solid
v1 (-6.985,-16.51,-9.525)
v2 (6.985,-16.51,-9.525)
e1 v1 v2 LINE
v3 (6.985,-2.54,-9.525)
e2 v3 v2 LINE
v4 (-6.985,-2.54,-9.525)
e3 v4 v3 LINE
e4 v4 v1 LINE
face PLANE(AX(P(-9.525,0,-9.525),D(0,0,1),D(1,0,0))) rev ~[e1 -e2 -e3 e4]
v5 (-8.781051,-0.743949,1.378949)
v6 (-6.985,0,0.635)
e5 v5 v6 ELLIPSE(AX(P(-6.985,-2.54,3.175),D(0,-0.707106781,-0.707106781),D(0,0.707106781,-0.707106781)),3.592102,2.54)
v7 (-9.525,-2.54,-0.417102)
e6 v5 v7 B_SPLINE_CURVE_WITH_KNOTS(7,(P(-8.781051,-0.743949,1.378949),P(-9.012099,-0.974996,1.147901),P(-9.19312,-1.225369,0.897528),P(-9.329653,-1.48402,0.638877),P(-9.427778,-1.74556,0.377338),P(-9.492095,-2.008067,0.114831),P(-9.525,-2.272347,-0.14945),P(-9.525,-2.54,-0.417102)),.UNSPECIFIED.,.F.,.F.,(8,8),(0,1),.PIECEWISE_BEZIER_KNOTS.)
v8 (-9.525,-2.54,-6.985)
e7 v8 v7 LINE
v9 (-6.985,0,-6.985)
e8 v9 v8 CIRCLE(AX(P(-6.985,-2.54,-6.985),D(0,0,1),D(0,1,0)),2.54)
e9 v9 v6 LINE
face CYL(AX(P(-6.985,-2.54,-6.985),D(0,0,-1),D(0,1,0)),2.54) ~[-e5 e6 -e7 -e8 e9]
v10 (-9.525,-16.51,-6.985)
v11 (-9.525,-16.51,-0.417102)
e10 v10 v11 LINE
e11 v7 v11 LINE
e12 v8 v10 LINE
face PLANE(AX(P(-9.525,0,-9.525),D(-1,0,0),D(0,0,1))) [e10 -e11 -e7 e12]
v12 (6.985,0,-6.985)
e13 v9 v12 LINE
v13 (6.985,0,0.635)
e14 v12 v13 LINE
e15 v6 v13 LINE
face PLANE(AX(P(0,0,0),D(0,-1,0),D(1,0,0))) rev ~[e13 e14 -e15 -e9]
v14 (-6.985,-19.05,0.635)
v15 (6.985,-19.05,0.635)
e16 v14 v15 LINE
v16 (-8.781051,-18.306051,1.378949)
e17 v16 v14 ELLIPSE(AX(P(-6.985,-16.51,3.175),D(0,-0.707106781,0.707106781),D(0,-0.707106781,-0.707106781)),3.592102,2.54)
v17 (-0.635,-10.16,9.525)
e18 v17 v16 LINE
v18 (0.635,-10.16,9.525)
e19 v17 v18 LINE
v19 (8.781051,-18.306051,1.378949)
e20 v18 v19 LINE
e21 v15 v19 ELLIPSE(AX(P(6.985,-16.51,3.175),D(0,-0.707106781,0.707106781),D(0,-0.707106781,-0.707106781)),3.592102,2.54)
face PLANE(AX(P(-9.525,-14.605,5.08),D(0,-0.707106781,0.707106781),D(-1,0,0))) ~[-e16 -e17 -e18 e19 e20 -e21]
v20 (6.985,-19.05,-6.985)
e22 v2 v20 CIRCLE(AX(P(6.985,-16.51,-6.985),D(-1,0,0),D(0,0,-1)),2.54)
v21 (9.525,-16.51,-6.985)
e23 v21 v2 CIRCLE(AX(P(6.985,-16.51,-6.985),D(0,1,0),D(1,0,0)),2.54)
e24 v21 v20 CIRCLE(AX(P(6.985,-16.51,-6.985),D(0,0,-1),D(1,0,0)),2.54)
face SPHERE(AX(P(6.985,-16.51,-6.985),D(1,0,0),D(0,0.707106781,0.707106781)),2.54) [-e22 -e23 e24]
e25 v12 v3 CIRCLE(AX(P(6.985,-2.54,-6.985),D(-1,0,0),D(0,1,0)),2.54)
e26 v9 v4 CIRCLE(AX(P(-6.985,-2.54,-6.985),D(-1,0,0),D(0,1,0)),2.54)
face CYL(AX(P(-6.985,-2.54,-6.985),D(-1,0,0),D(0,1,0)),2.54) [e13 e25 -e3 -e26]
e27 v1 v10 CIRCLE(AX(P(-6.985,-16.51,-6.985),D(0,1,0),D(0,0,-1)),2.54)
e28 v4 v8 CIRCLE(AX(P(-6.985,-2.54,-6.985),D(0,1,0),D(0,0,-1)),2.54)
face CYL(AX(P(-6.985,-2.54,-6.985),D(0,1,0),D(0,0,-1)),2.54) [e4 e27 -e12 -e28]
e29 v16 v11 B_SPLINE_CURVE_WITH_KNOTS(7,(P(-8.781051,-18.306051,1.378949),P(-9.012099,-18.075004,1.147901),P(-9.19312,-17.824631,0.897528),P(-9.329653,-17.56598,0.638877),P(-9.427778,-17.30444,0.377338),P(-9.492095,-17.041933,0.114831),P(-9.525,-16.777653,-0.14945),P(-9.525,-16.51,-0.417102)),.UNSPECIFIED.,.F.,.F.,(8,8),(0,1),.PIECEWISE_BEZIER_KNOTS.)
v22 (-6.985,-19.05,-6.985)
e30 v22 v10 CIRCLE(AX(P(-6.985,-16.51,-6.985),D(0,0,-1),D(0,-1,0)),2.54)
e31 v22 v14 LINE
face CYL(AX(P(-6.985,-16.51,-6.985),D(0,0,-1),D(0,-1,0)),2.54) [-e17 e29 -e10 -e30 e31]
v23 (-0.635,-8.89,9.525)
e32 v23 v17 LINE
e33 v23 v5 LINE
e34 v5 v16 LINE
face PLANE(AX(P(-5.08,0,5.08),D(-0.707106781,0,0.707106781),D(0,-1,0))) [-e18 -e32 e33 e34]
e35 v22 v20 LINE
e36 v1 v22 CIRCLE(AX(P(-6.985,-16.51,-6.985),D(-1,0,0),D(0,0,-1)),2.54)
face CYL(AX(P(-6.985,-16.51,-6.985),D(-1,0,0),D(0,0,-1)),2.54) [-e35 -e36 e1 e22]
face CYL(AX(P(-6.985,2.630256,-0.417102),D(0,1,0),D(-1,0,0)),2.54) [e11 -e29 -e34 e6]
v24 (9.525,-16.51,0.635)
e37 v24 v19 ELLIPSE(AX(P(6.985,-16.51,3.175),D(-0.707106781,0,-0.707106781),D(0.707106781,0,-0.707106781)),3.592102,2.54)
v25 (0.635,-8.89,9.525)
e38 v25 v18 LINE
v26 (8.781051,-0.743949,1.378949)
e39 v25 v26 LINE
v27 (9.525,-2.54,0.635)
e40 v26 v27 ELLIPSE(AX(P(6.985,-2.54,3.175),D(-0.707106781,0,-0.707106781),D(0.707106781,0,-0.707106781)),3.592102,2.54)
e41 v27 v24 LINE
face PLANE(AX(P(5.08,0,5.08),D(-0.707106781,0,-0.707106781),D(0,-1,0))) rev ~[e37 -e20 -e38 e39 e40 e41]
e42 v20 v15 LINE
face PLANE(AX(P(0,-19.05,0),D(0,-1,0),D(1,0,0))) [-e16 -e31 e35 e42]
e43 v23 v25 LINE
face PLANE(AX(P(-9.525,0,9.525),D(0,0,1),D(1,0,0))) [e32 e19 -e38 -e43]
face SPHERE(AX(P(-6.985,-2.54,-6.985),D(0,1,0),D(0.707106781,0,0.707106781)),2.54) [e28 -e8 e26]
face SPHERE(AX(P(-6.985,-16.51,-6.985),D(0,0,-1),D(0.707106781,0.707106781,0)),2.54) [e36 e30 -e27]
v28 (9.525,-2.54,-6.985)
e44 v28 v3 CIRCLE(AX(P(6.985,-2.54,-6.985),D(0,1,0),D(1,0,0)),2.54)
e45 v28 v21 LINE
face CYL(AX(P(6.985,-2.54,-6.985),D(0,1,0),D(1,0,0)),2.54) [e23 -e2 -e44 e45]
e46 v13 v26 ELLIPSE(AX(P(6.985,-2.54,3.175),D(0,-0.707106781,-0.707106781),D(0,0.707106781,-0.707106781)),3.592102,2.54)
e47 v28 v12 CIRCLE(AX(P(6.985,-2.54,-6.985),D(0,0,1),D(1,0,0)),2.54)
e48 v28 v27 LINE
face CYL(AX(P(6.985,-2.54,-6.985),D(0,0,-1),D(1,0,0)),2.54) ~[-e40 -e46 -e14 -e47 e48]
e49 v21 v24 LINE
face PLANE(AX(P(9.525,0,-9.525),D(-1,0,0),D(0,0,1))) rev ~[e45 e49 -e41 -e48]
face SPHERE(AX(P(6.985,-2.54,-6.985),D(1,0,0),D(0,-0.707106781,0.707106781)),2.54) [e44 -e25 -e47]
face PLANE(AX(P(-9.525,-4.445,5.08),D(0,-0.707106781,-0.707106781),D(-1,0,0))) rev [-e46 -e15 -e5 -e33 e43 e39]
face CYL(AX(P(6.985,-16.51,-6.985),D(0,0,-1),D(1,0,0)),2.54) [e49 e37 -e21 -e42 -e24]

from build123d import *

# Parameters (mm, degrees)
F0_W         = 19.05
F0_H         = 19.05
F1_DEPTH     = 19.05
F2_SIZE      = 8.89
F3_T1_DEPTH  = 13.97
F3_T3_DEPTH  = 13.97
F3_T5_DEPTH  = 24.3105122421
F3_T7_DEPTH  = 13.97
F3_S11_W     = 2.54
F3_S11_H     = 2.54
F3_T12_DEPTH = 2.54
F3_S17_W     = 2.54
F3_S17_H     = 2.54
F3_T18_DEPTH = 2.54
F3_S23_W     = 2.54
F3_S23_H     = 2.54
F3_T24_DEPTH = 2.54
F3_S29_W     = 2.54
F3_S29_H     = 2.54
F3_T30_DEPTH = 2.54


# Not quite as in the source:
# - a fillet or chamfer that OpenCascade refuses, or shapes differently, is made with other operations: its cross-section is extruded or revolved along the edge and cut away or added


with BuildPart() as f1:
    # F0 (on Front) → F1 (new body)
    with BuildSketch(Plane.XZ):
        Rectangle(F0_W, F0_H)
    extrude(amount=F1_DEPTH)

    # F2
    f2_edges = [f1.edges().sort_by_distance(p)[0] for p in [
        (0, -19.05, 9.525),
        (0, 0, 9.525),
        (9.525, -9.525, 9.525),
        (-9.525, -9.525, 9.525),
    ]]
    chamfer(f2_edges, length=F2_SIZE)

    # F3: fillet of radius 2.54 on 9 edges, made by hand

    # F3_s2 → F3_t1 (cut)
    with BuildSketch(Plane.XY.offset(-6.985)):
        with BuildLine():
            ThreePointArc((9.525, -16.51), (8.7810512242, -18.3060512242), (6.985, -19.05))
            Line((6.985, -19.05), (9.525, -19.05))
            Line((9.525, -19.05), (9.525, -16.51))
        make_face()
        with BuildLine():
            ThreePointArc((-6.985, 0), (-8.7810512242, -0.7439487758), (-9.525, -2.54))
            Line((-9.525, -2.54), (-9.525, 0))
            Line((-9.525, 0), (-6.985, 0))
        make_face()
        with BuildLine():
            ThreePointArc((-6.985, -19.05), (-8.7810512242, -18.3060512242), (-9.525, -16.51))
            Line((-9.525, -16.51), (-9.525, -19.05))
            Line((-9.525, -19.05), (-6.985, -19.05))
        make_face()
        with BuildLine():
            ThreePointArc((9.525, -2.54), (8.7810512242, -0.7439487758), (6.985, 0))
            Line((6.985, 0), (9.525, 0))
            Line((9.525, 0), (9.525, -2.54))
        make_face()
    extrude(amount=F3_T1_DEPTH, mode=Mode.SUBTRACT)

    # F3_s4 → F3_t3 (cut)
    with BuildSketch(Plane.YZ.offset(-6.985)):
        with BuildLine():
            ThreePointArc((-16.51, -9.525), (-18.3060512242, -8.7810512242), (-19.05, -6.985))
            Line((-19.05, -6.985), (-19.05, -9.525))
            Line((-19.05, -9.525), (-16.51, -9.525))
        make_face()
        with BuildLine():
            ThreePointArc((0, -6.985), (-0.7439487758, -8.7810512242), (-2.54, -9.525))
            Line((-2.54, -9.525), (0, -9.525))
            Line((0, -9.525), (0, -6.985))
        make_face()
    extrude(amount=F3_T3_DEPTH, mode=Mode.SUBTRACT)

    # F3_s6 → F3_t5 (cut)
    with BuildSketch(Plane.XZ.offset(-2.6302561211)):
        with BuildLine():
            ThreePointArc((-9.525, -0.4171024484), (-9.3316540126, 0.5549134698), (-8.7810512242, 1.3789487758))
            Line((-8.7810512242, 1.3789487758), (-9.525, 0.635))
            Line((-9.525, 0.635), (-9.525, -0.4171024484))
        make_face()
    extrude(amount=F3_T5_DEPTH, mode=Mode.SUBTRACT)

    # F3_s8 → F3_t7 (cut)
    with BuildSketch(Plane.XZ.offset(2.54)):
        with BuildLine():
            ThreePointArc((-6.985, -9.525), (-8.7810512242, -8.7810512242), (-9.525, -6.985))
            Line((-9.525, -6.985), (-9.525, -9.525))
            Line((-9.525, -9.525), (-6.985, -9.525))
        make_face()
        with BuildLine():
            ThreePointArc((9.525, -6.985), (8.7810512242, -8.7810512242), (6.985, -9.525))
            Line((6.985, -9.525), (9.525, -9.525))
            Line((9.525, -9.525), (9.525, -6.985))
        make_face()
    extrude(amount=F3_T7_DEPTH, mode=Mode.SUBTRACT)


with BuildPart() as f3_tool10:
    # F3_s11 → F3_t12 (new body)
    with BuildSketch(Plane.YZ.offset(6.985)):
        with Locations((-17.78, -8.255)):
            Rectangle(F3_S11_W, F3_S11_H)
    extrude(amount=F3_T12_DEPTH)

    # F3_s13 → F3_t14 (revolve, cut)
    with BuildSketch(Plane(origin=(6.985, -16.51, -6.985), x_dir=(0, 0.7071067812, 0.7071067812), z_dir=(0, 0.7071067812, -0.7071067812))):
        with BuildLine():
            ThreePointArc((0, -2.54), (2.54, 0), (0, 2.54))
            Line((0, 2.54), (0, -2.54))
        make_face()
    revolve(axis=Axis((6.985, -16.51, -6.985), (1, 0, 0)), mode=Mode.SUBTRACT)


with BuildPart() as f1_1:
    add(f1.part)

    # F3_t9: cut F3_tool10
    add(f3_tool10.part, mode=Mode.SUBTRACT)


with BuildPart() as f3_tool16:
    # F3_s17 → F3_t18 (new body)
    with BuildSketch(Plane.XY.offset(-6.985)):
        with Locations((-8.255, -17.78)):
            Rectangle(F3_S17_W, F3_S17_H)
    extrude(amount=-F3_T18_DEPTH)

    # F3_s19 → F3_t20 (revolve, cut)
    with BuildSketch(Plane(origin=(-6.985, -16.51, -6.985), x_dir=(0.7071067812, 0.7071067812, 0), z_dir=(-0.7071067812, 0.7071067812, 0))):
        with BuildLine():
            ThreePointArc((0, -2.54), (2.54, 0), (0, 2.54))
            Line((0, 2.54), (0, -2.54))
        make_face()
    revolve(axis=Axis((-6.985, -16.51, -6.985), (0, 0, -1)), mode=Mode.SUBTRACT)


with BuildPart() as f1_2:
    add(f1_1.part)

    # F3_t15: cut F3_tool16
    add(f3_tool16.part, mode=Mode.SUBTRACT)


with BuildPart() as f3_tool22:
    # F3_s23 → F3_t24 (new body)
    with BuildSketch(Plane.XZ.offset(2.54)):
        with Locations((-8.255, -8.255)):
            Rectangle(F3_S23_W, F3_S23_H)
    extrude(amount=-F3_T24_DEPTH)

    # F3_s25 → F3_t26 (revolve, cut)
    with BuildSketch(Plane(origin=(-6.985, -2.54, -6.985), x_dir=(0.7071067812, 0, 0.7071067812), z_dir=(-0.7071067812, 0, 0.7071067812))):
        with BuildLine():
            ThreePointArc((0, -2.54), (2.54, 0), (0, 2.54))
            Line((0, 2.54), (0, -2.54))
        make_face()
    revolve(axis=Axis((-6.985, -2.54, -6.985), (0, 1, 0)), mode=Mode.SUBTRACT)


with BuildPart() as f1_3:
    add(f1_2.part)

    # F3_t21: cut F3_tool22
    add(f3_tool22.part, mode=Mode.SUBTRACT)


with BuildPart() as f3_tool28:
    # F3_s29 → F3_t30 (new body)
    with BuildSketch(Plane.YZ.offset(6.985)):
        with Locations((-1.27, -8.255)):
            Rectangle(F3_S29_W, F3_S29_H)
    extrude(amount=F3_T30_DEPTH)

    # F3_s31 → F3_t32 (revolve, cut)
    with BuildSketch(Plane(origin=(6.985, -2.54, -6.985), x_dir=(0, -0.7071067812, 0.7071067812), z_dir=(0, 0.7071067812, 0.7071067812))):
        with BuildLine():
            ThreePointArc((0, -2.54), (2.54, 0), (0, 2.54))
            Line((0, 2.54), (0, -2.54))
        make_face()
    revolve(axis=Axis((6.985, -2.54, -6.985), (1, 0, 0)), mode=Mode.SUBTRACT)


with BuildPart() as f1_4:
    add(f1_3.part)

    # F3_t27: cut F3_tool28
    add(f3_tool28.part, mode=Mode.SUBTRACT)


solid = f1_4.part
